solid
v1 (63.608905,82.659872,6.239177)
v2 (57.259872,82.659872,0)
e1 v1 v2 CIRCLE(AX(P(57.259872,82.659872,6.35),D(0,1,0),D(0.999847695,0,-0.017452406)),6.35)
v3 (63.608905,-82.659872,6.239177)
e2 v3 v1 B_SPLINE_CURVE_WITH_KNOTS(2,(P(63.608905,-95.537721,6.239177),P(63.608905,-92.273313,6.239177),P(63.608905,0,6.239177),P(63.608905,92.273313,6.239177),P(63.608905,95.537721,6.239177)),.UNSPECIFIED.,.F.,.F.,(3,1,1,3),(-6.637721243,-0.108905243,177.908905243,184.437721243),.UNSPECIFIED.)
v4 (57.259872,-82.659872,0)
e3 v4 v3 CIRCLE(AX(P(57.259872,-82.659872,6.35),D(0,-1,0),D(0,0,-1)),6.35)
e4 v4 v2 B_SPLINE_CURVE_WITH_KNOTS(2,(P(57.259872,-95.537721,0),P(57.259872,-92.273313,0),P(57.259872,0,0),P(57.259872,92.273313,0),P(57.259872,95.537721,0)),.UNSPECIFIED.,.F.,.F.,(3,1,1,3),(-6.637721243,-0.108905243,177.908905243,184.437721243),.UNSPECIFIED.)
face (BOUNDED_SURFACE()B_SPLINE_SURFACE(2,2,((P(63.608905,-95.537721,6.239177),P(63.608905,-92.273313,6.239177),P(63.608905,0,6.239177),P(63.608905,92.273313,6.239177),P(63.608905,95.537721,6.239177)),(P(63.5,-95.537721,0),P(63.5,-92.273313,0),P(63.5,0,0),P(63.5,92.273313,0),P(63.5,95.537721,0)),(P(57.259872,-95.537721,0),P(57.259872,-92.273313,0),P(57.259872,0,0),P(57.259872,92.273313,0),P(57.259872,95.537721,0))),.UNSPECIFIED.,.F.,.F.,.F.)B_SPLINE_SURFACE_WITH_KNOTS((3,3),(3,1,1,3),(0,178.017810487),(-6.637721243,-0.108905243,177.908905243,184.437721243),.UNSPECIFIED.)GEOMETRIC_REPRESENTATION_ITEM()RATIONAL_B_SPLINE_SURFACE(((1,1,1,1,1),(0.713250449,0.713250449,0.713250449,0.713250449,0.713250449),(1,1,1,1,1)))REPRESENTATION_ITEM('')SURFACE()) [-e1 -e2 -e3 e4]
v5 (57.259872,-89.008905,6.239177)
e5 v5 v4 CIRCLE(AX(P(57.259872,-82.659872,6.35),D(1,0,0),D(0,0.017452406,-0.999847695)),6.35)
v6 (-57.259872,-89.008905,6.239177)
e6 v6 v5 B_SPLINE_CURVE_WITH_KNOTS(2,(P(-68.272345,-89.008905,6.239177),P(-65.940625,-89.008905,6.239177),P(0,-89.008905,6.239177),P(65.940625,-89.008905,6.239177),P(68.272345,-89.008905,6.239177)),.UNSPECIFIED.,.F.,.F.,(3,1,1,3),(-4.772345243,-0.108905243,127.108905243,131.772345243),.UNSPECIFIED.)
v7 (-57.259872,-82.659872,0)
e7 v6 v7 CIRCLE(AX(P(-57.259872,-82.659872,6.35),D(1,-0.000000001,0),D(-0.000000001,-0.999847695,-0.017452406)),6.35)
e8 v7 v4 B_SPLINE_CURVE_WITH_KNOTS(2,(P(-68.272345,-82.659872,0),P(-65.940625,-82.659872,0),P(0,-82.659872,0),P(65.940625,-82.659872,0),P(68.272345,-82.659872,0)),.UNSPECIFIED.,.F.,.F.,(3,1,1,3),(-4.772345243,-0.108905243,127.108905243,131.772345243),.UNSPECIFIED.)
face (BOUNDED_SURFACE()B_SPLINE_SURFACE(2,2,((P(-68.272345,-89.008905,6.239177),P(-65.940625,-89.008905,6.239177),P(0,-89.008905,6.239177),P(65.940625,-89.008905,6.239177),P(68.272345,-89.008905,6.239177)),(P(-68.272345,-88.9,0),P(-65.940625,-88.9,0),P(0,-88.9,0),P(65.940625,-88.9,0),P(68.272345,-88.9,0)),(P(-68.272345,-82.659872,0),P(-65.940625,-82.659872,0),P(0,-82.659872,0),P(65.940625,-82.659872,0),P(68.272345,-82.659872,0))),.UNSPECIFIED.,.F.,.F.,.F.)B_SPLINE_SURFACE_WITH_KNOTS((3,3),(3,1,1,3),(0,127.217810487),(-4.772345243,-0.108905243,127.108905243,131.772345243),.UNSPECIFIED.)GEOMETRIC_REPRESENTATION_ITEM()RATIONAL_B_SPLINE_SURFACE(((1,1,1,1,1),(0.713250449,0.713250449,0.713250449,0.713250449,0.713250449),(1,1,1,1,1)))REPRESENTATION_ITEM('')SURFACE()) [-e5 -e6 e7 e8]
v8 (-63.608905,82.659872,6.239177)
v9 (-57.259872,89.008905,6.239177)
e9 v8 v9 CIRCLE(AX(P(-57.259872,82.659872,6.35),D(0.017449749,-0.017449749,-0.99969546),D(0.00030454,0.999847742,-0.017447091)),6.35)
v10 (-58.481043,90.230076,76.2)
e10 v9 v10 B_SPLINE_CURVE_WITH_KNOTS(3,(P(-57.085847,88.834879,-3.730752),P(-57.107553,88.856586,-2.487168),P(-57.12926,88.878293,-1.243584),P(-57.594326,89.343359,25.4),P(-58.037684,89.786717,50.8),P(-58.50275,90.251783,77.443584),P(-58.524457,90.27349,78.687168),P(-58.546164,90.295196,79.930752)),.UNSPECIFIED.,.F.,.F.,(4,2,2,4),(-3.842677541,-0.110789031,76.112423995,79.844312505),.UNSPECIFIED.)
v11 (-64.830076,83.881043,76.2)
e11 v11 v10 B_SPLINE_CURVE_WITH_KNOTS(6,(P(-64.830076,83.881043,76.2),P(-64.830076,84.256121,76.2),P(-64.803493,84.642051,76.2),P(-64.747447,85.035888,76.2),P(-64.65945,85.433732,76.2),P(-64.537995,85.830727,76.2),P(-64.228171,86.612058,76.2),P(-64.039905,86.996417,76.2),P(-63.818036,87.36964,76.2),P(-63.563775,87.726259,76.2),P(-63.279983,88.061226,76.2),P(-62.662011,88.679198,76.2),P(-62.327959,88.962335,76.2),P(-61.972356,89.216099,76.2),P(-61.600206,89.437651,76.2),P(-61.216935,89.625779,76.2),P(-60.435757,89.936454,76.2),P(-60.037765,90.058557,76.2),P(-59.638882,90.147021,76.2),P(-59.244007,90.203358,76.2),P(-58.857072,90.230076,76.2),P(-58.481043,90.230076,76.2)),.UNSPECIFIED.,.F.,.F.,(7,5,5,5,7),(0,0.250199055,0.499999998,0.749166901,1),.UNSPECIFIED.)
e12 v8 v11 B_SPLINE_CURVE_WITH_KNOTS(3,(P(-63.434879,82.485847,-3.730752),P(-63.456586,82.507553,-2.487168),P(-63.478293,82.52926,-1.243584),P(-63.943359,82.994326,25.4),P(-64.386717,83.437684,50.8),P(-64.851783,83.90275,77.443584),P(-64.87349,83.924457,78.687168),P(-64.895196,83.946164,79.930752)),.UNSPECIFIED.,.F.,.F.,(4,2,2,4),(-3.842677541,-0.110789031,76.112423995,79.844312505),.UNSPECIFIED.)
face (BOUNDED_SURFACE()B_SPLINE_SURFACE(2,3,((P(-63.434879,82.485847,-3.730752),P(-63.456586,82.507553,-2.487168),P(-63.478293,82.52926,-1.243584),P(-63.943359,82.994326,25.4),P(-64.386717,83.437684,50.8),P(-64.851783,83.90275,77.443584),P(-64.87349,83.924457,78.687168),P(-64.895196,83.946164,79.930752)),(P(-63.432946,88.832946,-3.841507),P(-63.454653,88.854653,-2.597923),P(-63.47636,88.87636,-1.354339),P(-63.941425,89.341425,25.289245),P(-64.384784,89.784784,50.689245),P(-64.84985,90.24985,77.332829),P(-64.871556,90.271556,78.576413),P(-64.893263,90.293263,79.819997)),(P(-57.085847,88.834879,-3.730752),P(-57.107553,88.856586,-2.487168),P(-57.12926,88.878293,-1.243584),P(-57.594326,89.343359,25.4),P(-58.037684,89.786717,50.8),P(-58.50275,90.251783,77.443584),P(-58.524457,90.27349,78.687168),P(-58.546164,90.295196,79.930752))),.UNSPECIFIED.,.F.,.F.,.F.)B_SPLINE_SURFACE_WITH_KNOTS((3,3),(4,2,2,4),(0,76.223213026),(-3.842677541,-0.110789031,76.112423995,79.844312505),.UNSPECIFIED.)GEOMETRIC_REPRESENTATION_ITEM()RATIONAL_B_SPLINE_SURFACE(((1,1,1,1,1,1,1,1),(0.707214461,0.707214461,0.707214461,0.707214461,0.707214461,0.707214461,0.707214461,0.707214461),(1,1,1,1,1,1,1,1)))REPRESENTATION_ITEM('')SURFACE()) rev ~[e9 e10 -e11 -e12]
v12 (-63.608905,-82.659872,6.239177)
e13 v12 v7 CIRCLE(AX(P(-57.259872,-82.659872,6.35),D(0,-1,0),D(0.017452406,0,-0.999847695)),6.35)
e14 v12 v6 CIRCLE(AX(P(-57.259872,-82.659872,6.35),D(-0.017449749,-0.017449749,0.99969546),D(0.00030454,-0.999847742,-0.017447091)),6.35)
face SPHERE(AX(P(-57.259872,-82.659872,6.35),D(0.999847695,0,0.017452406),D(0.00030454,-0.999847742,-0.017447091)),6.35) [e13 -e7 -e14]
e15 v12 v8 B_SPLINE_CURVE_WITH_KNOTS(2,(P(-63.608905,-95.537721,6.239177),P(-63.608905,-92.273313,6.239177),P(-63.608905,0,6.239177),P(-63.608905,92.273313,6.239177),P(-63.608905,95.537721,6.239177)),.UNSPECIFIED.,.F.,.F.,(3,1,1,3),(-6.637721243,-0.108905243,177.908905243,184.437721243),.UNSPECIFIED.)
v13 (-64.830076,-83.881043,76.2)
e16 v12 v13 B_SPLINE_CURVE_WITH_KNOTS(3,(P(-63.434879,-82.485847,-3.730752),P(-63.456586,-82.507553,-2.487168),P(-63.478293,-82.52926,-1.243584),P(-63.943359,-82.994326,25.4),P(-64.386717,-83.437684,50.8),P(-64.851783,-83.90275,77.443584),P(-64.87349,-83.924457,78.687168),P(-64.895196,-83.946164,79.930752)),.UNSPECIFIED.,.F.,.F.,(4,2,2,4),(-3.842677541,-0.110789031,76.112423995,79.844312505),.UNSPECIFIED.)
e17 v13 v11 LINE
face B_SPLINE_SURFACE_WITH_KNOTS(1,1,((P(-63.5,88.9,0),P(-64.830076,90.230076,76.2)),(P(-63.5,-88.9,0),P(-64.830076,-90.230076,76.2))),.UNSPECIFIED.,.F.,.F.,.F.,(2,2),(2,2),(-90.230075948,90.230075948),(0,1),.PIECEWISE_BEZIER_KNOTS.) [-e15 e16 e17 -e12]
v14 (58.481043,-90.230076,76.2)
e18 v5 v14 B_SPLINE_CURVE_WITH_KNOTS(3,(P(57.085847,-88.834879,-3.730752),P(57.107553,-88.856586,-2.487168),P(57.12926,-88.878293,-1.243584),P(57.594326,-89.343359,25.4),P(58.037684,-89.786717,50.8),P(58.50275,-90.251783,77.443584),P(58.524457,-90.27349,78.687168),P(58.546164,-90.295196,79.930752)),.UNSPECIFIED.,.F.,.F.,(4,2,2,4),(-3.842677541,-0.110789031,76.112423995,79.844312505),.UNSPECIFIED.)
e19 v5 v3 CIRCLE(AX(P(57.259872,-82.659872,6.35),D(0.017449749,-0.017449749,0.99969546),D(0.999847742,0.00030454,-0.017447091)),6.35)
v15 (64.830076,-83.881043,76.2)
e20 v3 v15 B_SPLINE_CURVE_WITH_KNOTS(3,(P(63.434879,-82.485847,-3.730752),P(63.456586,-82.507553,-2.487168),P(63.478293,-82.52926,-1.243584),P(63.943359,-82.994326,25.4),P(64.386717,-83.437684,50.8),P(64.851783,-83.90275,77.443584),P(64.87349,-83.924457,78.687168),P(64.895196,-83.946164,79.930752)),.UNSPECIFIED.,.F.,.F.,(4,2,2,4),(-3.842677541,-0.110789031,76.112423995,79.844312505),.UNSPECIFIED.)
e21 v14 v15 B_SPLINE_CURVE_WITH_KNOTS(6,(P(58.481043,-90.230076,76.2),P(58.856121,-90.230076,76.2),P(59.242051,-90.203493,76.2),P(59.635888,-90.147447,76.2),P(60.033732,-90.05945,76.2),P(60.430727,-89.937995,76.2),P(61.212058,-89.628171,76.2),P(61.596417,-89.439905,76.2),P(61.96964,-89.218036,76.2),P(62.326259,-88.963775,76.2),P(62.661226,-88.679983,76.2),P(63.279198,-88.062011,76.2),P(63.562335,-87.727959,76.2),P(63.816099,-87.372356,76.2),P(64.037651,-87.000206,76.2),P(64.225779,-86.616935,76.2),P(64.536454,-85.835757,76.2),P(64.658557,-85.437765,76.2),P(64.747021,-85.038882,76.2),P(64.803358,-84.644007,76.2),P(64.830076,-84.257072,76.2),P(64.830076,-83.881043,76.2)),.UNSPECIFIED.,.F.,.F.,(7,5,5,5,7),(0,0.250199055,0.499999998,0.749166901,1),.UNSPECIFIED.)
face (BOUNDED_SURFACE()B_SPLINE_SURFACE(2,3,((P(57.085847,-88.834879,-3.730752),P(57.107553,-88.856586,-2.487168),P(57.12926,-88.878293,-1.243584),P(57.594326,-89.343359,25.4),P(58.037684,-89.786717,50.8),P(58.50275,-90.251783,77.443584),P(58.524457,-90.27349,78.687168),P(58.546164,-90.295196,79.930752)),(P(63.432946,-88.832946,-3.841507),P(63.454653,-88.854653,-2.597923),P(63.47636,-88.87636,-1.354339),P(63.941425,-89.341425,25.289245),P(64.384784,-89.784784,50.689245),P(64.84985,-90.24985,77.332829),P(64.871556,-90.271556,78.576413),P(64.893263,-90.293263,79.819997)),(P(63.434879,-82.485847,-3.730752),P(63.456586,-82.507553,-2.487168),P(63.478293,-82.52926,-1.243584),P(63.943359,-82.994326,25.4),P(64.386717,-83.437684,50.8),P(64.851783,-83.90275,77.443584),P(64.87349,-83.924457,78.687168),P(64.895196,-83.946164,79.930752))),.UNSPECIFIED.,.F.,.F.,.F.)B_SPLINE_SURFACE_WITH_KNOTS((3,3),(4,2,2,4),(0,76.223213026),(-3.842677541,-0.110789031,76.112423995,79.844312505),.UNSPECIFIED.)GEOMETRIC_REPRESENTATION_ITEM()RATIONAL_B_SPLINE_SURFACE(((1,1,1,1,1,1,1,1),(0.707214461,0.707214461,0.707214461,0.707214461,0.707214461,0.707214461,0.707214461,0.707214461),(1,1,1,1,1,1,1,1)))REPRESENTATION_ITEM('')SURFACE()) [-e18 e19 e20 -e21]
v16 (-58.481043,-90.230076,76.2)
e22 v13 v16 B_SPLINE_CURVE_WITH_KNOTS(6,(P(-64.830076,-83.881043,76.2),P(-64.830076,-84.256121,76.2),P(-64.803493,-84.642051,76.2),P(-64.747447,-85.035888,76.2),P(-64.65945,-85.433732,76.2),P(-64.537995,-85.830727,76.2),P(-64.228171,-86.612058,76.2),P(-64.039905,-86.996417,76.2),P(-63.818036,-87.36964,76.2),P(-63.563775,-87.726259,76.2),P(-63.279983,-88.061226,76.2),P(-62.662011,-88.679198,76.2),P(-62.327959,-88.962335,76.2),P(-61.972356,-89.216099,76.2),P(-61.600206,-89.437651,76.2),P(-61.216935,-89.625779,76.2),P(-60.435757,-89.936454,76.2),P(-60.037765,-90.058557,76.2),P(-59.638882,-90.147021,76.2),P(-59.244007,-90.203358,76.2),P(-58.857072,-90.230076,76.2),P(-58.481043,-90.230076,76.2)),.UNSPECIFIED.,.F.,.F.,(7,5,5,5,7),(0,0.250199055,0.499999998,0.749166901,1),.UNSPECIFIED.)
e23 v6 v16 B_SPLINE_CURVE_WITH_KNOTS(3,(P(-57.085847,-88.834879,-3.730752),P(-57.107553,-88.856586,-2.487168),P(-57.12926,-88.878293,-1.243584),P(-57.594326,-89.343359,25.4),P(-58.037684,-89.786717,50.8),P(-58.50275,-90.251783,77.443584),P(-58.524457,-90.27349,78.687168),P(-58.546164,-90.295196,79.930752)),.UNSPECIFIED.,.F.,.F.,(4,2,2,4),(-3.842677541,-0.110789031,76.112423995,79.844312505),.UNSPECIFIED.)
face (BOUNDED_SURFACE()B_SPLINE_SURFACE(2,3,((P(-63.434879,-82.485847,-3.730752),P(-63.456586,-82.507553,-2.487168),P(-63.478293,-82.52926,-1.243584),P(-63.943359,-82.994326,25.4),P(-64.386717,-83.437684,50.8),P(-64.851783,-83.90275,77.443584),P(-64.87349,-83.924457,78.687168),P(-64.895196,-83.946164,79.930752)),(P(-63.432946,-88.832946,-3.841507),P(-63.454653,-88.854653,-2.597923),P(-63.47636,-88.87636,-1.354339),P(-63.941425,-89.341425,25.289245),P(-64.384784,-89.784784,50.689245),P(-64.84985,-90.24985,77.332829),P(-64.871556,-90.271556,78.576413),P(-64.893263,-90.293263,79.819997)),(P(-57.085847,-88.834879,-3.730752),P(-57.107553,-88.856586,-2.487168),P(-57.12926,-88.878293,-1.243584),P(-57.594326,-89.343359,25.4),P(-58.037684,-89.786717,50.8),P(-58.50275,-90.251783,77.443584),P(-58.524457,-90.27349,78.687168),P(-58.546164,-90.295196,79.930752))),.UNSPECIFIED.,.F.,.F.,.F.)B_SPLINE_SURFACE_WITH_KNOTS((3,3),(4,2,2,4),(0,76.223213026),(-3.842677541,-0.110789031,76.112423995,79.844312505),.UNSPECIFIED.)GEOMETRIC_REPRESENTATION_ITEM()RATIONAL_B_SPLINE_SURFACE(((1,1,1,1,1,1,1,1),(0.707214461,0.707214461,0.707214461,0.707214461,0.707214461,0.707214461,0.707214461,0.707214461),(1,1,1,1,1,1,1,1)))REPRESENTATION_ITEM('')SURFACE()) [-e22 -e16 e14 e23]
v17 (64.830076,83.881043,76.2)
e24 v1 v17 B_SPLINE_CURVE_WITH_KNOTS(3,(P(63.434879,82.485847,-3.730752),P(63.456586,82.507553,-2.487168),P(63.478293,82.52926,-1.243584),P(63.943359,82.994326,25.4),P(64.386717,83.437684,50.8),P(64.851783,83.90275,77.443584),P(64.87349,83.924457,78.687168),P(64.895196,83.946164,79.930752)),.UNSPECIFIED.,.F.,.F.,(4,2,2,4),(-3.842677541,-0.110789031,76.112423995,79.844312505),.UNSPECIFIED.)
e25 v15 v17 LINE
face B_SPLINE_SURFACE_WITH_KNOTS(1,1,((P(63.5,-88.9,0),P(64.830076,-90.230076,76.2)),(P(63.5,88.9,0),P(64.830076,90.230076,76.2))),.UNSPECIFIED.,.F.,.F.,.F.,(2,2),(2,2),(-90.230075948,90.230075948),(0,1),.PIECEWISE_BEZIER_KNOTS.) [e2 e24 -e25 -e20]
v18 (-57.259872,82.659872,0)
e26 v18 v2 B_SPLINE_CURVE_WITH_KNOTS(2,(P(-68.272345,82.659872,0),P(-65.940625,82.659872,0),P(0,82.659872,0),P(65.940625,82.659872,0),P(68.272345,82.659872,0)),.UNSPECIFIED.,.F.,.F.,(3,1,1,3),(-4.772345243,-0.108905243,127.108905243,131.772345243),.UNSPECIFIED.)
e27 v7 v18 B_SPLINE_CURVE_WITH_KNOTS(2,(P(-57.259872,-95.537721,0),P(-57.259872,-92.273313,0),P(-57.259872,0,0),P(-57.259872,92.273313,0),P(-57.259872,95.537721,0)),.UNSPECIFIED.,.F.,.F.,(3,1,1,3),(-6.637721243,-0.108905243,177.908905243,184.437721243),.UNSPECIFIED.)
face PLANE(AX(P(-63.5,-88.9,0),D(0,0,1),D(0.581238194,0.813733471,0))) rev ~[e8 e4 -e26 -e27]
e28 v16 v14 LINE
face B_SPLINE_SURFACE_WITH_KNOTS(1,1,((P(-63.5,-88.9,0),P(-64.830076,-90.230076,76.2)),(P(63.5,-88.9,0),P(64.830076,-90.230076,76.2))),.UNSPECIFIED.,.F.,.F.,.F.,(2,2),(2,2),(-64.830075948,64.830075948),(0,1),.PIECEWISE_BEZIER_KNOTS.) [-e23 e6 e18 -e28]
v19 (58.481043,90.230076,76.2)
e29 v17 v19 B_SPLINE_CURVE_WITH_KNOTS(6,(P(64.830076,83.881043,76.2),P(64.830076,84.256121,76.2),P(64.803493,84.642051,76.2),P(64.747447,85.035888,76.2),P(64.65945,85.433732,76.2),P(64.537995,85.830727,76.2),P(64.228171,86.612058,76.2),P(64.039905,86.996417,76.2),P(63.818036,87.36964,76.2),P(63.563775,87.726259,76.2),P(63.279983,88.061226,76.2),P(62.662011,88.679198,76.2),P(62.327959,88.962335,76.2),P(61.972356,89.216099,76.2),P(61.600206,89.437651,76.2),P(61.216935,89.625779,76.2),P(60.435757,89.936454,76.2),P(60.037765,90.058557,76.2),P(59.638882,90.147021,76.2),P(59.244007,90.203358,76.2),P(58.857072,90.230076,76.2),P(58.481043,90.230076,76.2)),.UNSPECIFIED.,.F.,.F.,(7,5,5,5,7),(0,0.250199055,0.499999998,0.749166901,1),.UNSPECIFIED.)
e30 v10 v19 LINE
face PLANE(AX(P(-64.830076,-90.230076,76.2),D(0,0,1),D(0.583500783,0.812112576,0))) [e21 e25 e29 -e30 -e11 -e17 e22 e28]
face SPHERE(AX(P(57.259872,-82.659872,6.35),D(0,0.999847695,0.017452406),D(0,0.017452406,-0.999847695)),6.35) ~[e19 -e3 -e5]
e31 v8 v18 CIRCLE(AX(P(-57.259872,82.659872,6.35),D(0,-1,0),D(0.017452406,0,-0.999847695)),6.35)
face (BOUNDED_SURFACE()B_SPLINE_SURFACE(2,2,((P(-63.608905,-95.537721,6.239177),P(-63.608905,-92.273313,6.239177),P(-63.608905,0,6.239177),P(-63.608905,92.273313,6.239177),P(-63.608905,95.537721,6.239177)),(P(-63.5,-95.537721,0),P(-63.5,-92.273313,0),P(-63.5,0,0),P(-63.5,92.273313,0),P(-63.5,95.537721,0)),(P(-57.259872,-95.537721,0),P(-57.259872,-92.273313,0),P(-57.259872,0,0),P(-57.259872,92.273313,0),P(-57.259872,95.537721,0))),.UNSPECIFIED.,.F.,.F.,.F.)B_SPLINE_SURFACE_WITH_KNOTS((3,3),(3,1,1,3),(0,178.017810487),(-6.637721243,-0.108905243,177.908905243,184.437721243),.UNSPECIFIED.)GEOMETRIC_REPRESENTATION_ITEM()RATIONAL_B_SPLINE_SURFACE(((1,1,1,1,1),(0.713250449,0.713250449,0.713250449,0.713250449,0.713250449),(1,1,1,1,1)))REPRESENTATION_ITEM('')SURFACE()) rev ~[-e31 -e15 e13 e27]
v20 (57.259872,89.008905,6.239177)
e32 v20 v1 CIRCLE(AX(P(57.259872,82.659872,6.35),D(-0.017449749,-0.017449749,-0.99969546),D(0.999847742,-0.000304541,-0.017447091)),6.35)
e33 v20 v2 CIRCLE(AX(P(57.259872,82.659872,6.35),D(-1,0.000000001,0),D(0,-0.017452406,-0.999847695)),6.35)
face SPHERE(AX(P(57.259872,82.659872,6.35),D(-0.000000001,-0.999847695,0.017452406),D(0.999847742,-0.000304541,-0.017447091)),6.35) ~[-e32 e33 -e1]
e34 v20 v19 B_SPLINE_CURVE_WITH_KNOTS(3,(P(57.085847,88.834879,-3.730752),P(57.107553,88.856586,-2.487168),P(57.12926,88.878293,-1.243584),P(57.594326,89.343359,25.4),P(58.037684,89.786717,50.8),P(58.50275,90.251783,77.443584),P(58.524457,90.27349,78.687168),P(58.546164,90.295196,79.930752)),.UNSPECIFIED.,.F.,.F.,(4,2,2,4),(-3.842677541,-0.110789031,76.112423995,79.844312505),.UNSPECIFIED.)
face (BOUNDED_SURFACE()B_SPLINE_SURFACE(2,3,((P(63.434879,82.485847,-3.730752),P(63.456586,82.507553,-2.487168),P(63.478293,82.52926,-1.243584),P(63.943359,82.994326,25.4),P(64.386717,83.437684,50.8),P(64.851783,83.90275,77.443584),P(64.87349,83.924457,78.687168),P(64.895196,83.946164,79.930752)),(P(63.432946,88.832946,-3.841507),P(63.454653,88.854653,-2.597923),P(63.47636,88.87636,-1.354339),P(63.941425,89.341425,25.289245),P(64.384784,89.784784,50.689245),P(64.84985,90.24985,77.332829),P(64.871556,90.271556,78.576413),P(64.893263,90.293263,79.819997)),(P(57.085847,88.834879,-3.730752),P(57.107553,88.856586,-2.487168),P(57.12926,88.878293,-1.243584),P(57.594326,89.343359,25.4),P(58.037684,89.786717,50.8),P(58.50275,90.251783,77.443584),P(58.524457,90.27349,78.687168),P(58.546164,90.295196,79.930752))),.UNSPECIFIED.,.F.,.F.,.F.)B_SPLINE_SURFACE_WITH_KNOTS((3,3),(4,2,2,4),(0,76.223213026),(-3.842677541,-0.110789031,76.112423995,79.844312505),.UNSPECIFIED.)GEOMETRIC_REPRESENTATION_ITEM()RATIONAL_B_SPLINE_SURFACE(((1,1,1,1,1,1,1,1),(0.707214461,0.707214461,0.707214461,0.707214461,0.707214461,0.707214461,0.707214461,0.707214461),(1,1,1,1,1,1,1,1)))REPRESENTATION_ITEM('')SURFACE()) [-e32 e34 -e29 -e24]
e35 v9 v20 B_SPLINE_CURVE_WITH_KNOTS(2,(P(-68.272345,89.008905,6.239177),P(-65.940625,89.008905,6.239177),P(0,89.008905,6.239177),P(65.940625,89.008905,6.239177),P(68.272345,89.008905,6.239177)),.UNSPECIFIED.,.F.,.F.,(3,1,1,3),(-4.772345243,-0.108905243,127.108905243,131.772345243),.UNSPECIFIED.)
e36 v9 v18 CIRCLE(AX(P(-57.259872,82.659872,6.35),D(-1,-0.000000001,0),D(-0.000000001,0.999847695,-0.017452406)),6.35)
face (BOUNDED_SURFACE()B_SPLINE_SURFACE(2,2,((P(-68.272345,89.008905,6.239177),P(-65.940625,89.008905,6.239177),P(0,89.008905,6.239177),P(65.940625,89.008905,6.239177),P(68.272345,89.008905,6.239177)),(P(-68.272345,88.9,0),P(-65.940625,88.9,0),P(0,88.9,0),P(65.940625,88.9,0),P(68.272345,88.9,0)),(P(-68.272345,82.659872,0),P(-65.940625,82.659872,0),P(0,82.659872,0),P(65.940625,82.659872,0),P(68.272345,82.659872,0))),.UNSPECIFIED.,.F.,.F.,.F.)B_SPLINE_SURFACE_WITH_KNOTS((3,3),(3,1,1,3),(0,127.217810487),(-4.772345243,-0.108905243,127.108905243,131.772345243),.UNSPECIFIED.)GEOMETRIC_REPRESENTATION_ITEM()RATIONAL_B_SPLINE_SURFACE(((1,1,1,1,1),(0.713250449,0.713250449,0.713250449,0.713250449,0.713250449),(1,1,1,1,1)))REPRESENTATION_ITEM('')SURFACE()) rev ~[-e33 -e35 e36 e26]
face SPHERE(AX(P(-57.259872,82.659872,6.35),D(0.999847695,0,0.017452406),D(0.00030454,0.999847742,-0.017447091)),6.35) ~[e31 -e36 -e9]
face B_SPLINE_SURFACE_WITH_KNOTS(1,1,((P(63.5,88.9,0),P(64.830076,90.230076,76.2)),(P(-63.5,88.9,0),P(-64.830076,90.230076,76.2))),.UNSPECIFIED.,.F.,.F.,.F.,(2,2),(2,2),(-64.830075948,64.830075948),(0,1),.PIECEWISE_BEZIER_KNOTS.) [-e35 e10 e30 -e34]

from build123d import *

# Parameters (mm, degrees)
F0_W     = 127
F0_H     = 177.8
F1_DEPTH = 76.2
F1_TAPER = -1
F3_R     = 6.35


# Not quite as in the source:
# - a feature of the source that left no trace in its solid (it failed there, or was rolled back) is left out


with BuildPart() as f1:
    # F0 (on Top) → F1 (new body)
    with BuildSketch(Plane.XY):
        Rectangle(F0_W, F0_H)
    extrude(amount=F1_DEPTH, taper=F1_TAPER)

    # F3
    f3_edges = [f1.edges().sort_by_distance(p)[0] for p in [
        (63.5, 0, 0),
        (0, -88.9, 0),
        (64.165038, -89.565038, 38.1),
        (-64.165038, -89.565038, 38.1),
        (64.165038, 89.565038, 38.1),
        (0, 88.9, 0),
        (-64.165038, 89.565038, 38.1),
        (-63.5, 0, 0),
    ]]
    fillet(f3_edges, radius=F3_R)


solid = f1.part
